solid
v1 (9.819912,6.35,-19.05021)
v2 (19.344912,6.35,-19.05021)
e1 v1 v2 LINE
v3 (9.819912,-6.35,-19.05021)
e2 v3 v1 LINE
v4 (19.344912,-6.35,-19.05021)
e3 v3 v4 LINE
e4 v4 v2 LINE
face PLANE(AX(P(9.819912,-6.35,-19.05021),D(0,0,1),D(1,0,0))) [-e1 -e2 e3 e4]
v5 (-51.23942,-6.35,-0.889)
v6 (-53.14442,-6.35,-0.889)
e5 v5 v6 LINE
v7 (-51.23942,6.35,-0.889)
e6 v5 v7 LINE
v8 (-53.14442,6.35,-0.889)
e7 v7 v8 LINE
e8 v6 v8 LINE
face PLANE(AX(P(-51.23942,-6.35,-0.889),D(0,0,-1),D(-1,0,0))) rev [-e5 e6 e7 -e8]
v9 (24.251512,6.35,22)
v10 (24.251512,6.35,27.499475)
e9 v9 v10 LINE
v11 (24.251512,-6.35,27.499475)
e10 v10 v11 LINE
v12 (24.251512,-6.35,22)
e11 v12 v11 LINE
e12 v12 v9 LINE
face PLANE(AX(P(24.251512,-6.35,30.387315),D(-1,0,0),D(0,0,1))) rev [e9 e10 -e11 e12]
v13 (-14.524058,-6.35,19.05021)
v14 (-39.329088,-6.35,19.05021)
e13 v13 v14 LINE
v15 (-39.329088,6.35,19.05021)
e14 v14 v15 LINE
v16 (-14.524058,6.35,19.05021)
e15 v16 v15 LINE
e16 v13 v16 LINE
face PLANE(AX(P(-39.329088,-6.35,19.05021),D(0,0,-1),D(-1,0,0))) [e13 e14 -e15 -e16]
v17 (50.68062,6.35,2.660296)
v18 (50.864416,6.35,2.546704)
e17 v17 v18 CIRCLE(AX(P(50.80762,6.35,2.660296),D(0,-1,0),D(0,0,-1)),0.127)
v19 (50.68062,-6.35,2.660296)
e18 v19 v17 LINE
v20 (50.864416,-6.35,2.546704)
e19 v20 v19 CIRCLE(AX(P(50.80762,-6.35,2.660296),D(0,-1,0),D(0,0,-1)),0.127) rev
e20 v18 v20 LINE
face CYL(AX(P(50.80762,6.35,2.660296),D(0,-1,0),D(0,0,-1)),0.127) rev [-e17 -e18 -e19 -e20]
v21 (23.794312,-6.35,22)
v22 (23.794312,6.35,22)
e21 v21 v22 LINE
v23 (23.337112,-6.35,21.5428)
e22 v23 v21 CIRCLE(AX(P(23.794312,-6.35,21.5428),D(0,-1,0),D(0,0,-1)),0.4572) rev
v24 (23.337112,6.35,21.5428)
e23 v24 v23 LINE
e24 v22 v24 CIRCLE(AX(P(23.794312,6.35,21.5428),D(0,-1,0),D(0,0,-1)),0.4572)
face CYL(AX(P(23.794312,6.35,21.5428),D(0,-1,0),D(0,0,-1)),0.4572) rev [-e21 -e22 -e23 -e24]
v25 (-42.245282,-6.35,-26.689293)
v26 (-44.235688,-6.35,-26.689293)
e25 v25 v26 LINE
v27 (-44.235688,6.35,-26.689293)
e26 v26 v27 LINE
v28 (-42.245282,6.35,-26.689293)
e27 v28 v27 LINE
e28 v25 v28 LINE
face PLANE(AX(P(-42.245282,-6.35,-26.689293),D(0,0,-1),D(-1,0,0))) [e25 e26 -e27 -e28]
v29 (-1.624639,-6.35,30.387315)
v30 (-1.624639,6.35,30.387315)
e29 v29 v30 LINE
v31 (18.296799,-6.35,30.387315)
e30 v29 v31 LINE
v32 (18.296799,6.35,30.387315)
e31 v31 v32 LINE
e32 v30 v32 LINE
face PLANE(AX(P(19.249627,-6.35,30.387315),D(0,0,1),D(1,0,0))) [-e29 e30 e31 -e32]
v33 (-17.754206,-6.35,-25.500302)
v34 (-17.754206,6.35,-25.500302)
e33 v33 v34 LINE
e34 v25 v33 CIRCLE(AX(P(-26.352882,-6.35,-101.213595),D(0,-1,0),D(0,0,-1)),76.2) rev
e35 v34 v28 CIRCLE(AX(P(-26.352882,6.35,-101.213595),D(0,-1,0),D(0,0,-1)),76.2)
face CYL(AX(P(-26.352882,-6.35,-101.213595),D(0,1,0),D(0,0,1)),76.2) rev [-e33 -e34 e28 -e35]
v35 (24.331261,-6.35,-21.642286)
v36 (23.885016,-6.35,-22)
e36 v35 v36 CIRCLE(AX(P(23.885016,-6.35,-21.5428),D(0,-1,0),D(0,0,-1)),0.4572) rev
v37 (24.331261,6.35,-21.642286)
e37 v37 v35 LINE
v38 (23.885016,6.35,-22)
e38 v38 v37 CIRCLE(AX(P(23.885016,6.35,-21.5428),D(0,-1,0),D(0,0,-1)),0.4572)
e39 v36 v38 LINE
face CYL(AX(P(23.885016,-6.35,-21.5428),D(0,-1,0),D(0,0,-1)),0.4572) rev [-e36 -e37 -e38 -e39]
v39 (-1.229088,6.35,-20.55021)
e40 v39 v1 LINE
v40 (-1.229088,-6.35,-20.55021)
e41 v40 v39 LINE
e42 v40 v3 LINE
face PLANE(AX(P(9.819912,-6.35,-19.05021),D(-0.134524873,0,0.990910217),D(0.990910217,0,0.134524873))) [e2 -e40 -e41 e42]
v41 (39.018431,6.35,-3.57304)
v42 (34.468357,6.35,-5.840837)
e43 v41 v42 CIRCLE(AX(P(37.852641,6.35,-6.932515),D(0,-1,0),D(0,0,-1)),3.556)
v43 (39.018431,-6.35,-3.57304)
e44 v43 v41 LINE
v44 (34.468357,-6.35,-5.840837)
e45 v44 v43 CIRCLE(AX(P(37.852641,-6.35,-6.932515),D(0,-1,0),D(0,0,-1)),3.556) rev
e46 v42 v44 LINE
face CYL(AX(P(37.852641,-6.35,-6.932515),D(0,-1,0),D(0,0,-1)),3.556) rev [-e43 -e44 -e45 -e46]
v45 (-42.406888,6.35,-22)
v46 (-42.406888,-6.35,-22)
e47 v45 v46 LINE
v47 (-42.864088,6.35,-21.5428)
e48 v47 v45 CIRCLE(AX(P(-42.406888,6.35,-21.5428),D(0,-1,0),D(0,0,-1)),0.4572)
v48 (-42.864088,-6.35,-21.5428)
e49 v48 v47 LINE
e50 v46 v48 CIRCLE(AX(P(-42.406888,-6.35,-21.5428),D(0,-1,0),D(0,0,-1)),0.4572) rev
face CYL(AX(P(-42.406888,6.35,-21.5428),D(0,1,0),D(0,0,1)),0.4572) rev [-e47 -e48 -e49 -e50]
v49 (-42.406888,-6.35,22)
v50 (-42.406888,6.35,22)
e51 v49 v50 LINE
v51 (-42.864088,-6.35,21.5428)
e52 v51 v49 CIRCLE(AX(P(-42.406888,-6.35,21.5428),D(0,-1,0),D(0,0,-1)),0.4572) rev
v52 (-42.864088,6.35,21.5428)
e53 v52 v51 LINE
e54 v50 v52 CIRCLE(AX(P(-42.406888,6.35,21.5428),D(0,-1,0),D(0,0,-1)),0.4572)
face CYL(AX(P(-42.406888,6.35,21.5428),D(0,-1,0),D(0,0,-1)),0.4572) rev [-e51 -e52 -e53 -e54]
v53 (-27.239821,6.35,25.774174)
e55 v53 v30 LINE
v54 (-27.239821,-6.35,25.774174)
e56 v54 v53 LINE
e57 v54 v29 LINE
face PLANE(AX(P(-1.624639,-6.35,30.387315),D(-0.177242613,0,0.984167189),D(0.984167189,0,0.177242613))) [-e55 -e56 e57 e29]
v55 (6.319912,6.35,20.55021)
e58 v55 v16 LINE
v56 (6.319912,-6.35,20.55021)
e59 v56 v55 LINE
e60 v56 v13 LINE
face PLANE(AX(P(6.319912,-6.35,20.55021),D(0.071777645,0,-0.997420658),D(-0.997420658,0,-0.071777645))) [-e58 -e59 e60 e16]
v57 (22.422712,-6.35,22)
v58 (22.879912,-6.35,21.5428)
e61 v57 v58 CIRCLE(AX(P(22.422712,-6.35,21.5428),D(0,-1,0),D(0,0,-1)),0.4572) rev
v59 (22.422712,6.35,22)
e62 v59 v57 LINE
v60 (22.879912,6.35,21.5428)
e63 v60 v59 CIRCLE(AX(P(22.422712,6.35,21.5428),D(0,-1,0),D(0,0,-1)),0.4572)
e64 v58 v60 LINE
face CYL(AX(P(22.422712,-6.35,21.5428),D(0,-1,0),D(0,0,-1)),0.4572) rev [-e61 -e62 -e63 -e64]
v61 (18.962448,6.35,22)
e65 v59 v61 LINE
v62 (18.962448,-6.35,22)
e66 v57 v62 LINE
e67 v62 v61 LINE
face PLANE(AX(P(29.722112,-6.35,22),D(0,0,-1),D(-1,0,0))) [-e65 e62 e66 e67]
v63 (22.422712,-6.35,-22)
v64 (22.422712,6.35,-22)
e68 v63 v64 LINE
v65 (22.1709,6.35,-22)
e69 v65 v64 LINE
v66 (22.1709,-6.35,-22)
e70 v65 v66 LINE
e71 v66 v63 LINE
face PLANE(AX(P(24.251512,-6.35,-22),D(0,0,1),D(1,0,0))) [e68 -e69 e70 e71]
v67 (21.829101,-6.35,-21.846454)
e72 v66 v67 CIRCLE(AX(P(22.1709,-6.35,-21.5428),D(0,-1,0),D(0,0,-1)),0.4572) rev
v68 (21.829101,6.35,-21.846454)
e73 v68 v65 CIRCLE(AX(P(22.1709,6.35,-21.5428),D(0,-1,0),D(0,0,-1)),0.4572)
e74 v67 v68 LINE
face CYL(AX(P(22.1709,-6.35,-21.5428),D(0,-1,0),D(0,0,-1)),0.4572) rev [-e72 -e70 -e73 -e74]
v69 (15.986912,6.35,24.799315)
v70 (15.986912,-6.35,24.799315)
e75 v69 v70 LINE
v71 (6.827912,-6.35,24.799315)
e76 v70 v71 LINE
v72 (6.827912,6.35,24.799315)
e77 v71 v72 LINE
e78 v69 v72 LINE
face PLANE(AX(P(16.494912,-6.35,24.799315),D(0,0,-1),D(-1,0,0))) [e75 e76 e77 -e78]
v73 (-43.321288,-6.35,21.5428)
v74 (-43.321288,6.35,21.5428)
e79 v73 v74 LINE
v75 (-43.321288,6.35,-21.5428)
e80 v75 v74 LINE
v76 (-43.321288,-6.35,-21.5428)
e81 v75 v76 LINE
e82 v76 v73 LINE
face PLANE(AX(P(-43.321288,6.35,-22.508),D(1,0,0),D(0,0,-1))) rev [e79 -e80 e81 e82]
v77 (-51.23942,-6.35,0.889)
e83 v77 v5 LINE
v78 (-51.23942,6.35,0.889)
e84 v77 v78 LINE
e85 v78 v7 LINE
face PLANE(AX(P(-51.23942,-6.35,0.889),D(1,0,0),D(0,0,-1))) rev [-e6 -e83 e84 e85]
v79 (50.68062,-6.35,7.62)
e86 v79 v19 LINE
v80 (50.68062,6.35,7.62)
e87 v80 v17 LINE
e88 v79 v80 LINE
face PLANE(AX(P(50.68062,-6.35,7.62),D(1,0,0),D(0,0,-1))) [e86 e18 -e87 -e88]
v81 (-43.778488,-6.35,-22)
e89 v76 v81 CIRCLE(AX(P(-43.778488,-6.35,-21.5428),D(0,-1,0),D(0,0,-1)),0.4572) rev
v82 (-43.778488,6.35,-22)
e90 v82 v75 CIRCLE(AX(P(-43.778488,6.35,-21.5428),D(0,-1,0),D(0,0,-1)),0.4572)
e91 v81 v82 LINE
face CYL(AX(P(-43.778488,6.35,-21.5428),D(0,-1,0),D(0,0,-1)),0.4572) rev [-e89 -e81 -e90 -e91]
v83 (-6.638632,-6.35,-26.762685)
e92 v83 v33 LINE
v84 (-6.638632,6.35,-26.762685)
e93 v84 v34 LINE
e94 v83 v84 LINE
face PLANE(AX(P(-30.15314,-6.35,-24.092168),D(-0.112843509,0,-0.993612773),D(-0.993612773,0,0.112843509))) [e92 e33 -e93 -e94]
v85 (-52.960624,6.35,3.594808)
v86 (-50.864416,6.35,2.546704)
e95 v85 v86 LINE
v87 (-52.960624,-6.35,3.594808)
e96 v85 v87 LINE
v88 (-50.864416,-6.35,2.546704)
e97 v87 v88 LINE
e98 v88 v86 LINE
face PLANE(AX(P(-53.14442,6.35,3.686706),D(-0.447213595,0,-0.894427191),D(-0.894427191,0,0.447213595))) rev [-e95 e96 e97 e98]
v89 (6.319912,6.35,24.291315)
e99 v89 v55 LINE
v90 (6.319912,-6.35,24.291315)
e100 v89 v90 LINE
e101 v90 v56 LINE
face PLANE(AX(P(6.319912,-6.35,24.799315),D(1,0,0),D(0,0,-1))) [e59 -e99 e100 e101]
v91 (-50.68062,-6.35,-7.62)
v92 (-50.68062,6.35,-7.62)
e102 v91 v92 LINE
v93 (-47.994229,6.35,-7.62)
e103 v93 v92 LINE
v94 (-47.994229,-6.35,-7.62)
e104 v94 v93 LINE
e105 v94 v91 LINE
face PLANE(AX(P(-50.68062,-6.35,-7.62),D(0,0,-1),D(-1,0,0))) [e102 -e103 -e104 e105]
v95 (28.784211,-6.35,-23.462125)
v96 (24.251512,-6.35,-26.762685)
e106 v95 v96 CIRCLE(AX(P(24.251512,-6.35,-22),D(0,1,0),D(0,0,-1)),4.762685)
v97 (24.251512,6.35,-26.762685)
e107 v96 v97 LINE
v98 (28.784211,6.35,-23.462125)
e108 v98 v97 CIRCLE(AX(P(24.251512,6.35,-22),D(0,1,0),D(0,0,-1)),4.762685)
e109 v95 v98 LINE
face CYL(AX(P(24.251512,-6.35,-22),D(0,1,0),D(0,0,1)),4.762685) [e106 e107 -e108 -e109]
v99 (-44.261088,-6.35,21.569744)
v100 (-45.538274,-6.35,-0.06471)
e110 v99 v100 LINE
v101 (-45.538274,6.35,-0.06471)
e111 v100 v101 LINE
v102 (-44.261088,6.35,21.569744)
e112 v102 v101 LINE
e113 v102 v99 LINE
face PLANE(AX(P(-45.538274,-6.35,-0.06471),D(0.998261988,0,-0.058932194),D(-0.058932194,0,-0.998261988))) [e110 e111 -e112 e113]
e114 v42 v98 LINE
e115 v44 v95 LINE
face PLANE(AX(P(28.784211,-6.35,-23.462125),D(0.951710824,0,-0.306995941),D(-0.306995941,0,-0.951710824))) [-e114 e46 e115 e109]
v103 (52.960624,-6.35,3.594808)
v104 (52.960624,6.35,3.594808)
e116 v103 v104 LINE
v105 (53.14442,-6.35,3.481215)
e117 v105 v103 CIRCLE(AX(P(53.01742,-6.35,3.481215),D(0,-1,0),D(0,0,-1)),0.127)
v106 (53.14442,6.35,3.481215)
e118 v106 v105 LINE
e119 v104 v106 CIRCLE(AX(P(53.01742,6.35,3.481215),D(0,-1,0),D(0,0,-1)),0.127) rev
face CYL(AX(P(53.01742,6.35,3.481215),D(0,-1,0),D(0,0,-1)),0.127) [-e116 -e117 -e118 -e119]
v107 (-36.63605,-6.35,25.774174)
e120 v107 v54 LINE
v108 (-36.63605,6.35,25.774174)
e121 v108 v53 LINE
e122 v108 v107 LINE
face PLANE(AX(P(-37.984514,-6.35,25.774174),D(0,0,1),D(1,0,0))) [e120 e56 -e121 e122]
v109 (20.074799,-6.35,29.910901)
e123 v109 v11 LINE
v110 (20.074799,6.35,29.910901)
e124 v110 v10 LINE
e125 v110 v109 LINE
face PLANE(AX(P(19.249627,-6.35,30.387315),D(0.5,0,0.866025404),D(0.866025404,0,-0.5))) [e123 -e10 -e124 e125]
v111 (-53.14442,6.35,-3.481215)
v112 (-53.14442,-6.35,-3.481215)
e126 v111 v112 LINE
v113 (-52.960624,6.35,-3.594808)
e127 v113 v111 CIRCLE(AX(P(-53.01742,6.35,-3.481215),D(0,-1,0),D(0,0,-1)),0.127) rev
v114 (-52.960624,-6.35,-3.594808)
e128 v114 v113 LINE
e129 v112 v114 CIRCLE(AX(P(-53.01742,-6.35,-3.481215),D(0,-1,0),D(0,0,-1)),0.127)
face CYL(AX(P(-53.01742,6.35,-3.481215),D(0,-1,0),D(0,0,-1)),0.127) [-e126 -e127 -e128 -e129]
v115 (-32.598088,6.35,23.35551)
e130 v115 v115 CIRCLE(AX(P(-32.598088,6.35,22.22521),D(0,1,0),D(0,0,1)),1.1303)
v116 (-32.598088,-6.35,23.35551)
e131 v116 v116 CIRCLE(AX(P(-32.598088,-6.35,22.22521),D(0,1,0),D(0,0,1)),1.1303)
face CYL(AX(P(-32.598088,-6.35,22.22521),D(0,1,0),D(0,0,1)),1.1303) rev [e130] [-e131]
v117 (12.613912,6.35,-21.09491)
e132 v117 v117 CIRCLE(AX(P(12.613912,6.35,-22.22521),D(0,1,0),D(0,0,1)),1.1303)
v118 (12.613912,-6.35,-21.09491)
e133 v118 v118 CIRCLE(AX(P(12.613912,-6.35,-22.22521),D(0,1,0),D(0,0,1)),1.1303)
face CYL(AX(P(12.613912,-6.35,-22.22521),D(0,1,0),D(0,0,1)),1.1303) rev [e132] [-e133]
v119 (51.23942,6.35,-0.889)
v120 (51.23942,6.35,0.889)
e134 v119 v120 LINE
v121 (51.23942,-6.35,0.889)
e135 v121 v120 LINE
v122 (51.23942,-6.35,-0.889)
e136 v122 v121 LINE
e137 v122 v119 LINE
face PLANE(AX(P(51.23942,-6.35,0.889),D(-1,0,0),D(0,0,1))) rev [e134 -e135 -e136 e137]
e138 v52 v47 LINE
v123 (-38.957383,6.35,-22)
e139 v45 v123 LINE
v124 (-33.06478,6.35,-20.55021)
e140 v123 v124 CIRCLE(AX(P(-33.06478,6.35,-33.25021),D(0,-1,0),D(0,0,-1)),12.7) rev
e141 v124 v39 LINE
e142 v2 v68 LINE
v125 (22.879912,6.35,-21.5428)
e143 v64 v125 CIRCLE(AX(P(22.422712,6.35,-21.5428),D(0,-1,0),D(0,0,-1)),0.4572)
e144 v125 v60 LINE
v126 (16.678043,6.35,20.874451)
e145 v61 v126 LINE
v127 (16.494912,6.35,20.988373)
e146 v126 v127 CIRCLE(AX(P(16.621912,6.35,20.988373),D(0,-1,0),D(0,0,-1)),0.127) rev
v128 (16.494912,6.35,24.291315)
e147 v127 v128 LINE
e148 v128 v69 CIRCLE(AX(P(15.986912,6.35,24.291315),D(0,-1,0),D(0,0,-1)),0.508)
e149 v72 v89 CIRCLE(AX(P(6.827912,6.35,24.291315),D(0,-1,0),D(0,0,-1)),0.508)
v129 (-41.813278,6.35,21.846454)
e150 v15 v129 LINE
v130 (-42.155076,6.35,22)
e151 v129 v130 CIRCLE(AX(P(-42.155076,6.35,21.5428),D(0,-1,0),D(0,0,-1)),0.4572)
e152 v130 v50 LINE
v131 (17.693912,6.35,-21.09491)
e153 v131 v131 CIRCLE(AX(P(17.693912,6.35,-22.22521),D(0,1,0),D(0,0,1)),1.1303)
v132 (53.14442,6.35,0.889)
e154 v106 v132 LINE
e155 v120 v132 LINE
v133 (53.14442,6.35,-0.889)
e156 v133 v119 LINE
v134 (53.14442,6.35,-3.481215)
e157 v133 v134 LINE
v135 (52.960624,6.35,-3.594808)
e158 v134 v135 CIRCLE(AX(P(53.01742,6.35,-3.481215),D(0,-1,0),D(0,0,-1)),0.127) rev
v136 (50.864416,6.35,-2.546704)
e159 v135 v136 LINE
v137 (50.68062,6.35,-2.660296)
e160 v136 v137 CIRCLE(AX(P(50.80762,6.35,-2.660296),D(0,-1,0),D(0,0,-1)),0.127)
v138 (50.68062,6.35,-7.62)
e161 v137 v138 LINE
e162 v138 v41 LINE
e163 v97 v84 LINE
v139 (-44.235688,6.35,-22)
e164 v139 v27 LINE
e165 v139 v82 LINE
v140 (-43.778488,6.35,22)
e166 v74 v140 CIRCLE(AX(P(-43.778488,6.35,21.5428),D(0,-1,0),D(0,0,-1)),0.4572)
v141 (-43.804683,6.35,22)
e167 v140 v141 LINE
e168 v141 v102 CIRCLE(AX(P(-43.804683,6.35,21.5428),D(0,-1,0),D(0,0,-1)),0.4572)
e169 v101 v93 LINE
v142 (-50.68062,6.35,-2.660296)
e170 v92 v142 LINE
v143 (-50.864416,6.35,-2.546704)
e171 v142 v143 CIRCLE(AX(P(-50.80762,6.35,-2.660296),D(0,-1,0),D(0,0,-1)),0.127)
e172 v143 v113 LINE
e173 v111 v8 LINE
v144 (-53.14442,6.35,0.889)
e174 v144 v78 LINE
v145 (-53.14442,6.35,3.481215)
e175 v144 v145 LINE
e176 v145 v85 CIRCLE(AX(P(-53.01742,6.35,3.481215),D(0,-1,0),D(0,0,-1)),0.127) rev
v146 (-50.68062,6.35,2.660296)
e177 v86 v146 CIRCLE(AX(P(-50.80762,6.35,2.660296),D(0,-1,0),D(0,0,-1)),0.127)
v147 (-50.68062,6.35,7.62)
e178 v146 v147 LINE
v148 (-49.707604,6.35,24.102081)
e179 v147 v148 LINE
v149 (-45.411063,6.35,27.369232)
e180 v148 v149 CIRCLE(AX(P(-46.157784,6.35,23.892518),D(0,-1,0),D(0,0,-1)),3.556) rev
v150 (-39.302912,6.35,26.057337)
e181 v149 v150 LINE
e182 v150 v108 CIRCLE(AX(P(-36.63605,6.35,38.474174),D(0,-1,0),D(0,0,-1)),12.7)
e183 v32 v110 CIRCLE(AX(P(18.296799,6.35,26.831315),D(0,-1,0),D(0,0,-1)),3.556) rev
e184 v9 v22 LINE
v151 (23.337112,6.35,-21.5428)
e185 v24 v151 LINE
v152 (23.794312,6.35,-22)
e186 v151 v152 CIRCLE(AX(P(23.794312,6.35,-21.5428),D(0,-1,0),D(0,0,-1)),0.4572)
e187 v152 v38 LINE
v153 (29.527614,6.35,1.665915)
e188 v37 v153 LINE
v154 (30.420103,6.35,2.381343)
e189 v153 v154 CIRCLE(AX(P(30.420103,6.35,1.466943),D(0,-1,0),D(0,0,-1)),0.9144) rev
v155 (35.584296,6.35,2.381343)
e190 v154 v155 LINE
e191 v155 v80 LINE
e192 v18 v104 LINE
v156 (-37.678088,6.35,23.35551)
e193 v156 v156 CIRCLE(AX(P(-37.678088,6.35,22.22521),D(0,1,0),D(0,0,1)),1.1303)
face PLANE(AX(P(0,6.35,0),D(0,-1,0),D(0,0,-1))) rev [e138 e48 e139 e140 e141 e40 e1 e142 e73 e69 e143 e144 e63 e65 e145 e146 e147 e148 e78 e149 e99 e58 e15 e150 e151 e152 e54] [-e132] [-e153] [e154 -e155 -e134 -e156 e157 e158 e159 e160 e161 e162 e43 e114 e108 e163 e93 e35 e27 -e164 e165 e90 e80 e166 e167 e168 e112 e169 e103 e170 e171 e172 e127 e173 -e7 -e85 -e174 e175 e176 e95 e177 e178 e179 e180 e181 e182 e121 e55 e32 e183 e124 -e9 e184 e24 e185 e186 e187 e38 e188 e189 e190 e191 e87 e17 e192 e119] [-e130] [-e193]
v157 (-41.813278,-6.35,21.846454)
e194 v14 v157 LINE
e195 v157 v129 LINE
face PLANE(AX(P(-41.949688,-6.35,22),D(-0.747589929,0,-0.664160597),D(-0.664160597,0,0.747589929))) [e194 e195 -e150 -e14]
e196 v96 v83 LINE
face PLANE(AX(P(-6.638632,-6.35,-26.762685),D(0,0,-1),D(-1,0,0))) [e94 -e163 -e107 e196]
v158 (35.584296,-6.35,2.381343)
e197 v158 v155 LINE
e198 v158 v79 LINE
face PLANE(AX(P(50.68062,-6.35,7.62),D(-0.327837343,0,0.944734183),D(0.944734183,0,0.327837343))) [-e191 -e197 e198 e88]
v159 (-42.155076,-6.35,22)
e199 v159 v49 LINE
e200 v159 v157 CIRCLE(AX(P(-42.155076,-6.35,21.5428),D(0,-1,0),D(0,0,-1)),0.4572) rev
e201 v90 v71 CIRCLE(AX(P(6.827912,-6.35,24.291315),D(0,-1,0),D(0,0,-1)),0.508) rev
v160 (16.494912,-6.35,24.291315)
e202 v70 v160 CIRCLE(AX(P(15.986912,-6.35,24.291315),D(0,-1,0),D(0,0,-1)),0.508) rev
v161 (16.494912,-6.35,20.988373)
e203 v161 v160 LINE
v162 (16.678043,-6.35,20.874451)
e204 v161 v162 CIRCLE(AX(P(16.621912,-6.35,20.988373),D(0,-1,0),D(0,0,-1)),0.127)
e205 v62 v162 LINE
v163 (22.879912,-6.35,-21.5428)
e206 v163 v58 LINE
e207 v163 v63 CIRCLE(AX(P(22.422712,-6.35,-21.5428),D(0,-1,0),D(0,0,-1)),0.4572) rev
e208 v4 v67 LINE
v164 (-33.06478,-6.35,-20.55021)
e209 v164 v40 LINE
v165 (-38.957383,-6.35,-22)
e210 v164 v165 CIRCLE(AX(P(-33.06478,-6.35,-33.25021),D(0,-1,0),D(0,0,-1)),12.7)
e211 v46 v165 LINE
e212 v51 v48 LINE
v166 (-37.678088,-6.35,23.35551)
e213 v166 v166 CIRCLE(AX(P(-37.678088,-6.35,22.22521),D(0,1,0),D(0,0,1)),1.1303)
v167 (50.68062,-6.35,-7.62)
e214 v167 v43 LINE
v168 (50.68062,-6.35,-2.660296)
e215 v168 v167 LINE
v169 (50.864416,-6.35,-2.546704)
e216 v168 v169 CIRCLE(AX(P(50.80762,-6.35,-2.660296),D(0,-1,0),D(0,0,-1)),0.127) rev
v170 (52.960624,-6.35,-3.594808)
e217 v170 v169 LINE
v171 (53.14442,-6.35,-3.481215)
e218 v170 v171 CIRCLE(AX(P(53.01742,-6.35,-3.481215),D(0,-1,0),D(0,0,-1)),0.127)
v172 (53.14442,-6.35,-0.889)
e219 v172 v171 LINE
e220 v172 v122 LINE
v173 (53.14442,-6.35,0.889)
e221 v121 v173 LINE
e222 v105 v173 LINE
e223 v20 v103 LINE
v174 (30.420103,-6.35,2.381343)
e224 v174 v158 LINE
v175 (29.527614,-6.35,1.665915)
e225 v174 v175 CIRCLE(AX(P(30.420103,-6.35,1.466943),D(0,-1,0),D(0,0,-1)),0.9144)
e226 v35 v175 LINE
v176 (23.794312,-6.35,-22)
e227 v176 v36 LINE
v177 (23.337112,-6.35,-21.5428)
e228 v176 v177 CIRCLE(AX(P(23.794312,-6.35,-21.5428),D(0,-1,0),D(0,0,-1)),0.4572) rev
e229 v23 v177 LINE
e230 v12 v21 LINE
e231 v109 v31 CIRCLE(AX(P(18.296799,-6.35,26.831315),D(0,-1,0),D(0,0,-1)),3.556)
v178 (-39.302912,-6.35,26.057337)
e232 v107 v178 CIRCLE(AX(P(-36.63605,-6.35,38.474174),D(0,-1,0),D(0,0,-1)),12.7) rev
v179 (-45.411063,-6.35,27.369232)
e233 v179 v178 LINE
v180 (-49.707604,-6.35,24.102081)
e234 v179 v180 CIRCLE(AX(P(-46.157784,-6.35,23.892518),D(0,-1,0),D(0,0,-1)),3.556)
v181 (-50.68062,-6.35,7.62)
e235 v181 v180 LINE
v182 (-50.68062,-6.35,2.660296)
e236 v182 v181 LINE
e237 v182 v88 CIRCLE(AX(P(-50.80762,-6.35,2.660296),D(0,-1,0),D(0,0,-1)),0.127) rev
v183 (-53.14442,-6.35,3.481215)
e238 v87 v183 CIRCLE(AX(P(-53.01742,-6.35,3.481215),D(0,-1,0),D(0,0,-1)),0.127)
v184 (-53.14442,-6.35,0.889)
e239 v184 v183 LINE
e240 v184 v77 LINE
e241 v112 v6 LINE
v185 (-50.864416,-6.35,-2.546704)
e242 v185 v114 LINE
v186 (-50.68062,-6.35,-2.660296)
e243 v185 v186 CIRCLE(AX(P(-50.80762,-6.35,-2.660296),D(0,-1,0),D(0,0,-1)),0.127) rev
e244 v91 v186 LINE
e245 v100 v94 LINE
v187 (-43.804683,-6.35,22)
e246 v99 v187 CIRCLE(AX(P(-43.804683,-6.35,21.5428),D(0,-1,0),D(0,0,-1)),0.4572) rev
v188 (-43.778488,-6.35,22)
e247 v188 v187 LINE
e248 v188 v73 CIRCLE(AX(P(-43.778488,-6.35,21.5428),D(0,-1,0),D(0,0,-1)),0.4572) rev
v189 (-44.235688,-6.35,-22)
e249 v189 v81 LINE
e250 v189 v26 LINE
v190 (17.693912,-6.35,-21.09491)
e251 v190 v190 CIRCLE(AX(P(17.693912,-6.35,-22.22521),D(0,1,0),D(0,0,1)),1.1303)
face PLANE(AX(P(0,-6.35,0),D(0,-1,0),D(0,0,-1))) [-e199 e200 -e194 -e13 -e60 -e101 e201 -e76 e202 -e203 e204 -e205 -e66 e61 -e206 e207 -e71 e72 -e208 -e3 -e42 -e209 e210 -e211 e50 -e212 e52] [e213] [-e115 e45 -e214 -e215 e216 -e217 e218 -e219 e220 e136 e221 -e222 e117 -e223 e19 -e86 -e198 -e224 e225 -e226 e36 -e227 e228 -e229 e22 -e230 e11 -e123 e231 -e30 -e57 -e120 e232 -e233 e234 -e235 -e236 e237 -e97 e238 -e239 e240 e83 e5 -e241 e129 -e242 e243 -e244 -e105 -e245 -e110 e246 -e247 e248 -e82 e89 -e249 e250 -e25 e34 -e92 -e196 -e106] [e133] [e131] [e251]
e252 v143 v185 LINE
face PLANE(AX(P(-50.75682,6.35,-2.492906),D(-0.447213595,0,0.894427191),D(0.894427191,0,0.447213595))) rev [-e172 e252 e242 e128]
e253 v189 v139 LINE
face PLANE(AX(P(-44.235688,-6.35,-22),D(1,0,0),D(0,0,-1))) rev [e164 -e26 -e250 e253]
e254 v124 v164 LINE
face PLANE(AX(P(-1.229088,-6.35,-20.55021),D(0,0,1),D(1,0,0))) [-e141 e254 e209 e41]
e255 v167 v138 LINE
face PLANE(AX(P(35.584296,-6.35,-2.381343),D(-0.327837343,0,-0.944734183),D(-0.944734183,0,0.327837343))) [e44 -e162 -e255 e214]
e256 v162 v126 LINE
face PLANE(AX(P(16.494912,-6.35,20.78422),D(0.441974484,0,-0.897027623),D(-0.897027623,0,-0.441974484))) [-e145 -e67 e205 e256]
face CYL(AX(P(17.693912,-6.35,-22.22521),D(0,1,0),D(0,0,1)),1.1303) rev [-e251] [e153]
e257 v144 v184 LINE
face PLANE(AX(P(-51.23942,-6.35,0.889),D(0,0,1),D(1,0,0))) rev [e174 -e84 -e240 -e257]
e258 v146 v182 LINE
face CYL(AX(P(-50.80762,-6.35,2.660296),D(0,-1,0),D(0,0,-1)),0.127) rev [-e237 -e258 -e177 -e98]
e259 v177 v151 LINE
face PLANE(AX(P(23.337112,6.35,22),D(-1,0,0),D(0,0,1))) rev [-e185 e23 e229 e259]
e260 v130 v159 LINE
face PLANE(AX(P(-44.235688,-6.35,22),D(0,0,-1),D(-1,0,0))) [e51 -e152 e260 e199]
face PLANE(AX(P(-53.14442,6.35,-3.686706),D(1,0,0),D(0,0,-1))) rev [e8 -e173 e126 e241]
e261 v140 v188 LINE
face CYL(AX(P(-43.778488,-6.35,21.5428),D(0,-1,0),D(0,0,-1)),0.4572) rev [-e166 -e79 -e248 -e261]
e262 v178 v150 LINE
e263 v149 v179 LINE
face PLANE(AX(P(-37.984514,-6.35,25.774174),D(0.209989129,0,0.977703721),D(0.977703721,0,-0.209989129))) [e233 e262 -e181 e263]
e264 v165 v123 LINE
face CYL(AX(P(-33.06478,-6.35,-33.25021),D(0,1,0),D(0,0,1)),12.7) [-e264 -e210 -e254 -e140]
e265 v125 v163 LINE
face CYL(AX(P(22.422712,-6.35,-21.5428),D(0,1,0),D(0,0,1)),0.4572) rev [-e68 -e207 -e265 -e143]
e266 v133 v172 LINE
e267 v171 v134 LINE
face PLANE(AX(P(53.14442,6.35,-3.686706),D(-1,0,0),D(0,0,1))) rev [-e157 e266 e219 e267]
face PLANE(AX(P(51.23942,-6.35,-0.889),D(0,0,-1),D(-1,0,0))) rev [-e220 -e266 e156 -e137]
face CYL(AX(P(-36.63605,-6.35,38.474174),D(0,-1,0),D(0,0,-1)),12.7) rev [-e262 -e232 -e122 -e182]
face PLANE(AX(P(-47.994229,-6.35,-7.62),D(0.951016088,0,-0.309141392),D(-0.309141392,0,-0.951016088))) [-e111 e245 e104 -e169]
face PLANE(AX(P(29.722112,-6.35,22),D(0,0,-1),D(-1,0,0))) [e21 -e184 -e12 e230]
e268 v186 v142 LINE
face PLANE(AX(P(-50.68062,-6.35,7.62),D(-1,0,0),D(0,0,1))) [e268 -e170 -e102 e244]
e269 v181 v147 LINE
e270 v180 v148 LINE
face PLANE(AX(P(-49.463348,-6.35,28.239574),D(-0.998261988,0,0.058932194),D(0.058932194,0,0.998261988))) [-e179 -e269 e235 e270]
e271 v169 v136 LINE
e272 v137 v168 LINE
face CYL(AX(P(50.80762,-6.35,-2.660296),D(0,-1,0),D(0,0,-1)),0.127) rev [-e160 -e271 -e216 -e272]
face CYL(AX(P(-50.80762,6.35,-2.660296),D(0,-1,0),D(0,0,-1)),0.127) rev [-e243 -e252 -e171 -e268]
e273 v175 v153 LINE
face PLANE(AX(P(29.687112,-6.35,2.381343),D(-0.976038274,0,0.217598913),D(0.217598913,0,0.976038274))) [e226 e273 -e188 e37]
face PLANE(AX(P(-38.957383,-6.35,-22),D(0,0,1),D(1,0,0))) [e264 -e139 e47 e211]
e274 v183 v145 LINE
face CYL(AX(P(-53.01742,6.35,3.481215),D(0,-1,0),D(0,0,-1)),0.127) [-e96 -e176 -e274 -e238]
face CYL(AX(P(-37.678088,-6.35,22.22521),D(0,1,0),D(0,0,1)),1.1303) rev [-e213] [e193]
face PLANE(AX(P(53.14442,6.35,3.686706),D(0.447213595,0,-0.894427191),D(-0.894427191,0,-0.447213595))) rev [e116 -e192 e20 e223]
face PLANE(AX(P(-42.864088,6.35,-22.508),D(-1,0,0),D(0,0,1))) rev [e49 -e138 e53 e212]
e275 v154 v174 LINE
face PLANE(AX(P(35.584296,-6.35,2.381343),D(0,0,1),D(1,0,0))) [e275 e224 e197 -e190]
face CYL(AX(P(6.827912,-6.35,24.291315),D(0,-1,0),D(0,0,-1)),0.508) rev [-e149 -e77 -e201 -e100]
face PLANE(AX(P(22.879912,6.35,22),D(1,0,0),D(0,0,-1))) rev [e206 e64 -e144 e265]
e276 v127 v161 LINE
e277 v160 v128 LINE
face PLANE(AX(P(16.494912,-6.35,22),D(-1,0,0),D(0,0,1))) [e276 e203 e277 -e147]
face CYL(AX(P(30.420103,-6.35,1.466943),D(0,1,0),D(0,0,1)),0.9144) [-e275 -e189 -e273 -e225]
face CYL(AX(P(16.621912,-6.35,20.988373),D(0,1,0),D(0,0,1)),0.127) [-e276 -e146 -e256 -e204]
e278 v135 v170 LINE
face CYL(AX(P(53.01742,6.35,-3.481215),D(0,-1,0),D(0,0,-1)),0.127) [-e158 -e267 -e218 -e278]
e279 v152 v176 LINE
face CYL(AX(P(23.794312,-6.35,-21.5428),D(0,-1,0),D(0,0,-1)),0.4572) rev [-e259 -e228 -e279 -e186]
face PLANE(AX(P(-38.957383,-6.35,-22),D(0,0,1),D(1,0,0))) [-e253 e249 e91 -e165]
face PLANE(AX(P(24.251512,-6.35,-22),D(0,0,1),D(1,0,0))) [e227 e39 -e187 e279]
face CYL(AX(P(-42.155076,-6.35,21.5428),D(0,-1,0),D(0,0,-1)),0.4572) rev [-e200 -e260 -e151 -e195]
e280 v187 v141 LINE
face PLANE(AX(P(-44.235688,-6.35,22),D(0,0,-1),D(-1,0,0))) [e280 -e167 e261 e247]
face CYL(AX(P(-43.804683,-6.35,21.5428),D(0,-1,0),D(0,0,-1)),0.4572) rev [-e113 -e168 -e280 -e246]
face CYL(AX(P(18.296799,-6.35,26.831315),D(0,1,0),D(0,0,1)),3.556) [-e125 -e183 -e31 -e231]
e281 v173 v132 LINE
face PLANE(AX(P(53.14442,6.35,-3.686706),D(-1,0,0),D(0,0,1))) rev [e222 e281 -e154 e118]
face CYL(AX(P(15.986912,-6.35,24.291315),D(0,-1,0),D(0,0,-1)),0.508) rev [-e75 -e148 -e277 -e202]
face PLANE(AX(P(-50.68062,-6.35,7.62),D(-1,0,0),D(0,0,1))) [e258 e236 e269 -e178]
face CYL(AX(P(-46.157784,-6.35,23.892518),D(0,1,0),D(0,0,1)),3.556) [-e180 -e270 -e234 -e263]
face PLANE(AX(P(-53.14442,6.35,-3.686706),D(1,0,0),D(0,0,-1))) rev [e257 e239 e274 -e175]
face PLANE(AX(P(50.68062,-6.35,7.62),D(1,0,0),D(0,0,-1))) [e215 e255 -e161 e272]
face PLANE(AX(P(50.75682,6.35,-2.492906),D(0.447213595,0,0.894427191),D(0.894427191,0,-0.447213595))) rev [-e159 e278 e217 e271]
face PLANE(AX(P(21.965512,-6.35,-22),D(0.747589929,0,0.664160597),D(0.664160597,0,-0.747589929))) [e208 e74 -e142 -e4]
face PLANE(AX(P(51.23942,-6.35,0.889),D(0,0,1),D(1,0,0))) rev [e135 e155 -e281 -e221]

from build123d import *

# Parameters (mm, degrees)
BOSS_EXTRUDE1_DEPTH        = 6.35
BOSS_EXTRUDE1_DEPTH_BACK   = 6.35
BOSS_EXTRUDE1_2_DEPTH      = 6.35
BOSS_EXTRUDE1_2_DEPTH_BACK = 6.35
BOSS_EXTRUDE2_DEPTH        = 6.35
BOSS_EXTRUDE2_DEPTH_BACK   = 6.35
SKETCH3_W                  = 0.4572
SKETCH3_H                  = 44.508
BOSS_EXTRUDE4_DEPTH        = 6.35
BOSS_EXTRUDE4_DEPTH_BACK   = 6.35
SKETCH8_W                  = 2.032
SKETCH8_H                  = 1.778
CUT_EXTRUDE1_DEPTH         = 63.522062345
FILLET1_R                  = 0.4572
FILLET2_R                  = 0.9144
FILLET3_R                  = 3.556
FILLET6_R                  = 12.7
SKETCH9_R                  = 1.1303
CUT_EXTRUDE2_DEPTH         = 63.522062345
FILLET7_R                  = 0.127
FILLET8_R                  = 0.508
FILLET9_R                  = 76.2
SKETCH12_W                 = 3.975578287
SKETCH12_H                 = 4.68929279
SKETCH12_W_2               = 5.470600001
SKETCH12_H_2               = 8.387314833
CUT_EXTRUDE3_DEPTH         = 63.522062345
FILLET10_R                 = 0.127


with BuildPart() as part:
    # Sketch2 → Boss-Extrude1 (new, two sides: drawn at the far end of the back side and taken through both)
    with BuildSketch(Plane(origin=(0, 0, 0), x_dir=(1, 0, 0), z_dir=(0, 1, 0)).offset(-BOSS_EXTRUDE1_DEPTH_BACK)):
        with BuildLine():
            Line((9.819911786, 19.050210052), (19.344911786, 19.050210052))
            Line((19.344911786, 19.050210052), (21.965511899, 22))
            Line((21.965511899, 22), (24.251511899, 22))
            Line((24.251511899, 22), (29.687111899, -2.381342584))
            Line((29.687111899, -2.381342584), (35.584296061, -2.381342584))
            Line((35.584296061, -2.381342584), (50.68062, -7.62))
            Line((50.68062, -7.62), (50.68062, 7.62))
            Line((50.68062, 7.62), (35.584296061, 2.381342584))
            Line((35.584296061, 2.381342584), (28.784210924, 23.462125012))
            ThreePointArc((28.784210924, 23.462125012), (27.055039043, 25.850117603), (24.251511899, 26.762685167))
            Line((24.251511899, 26.762685167), (-6.638632099, 26.762685167))
            Line((-6.638632099, 26.762685167), (-30.153140375, 24.092168337))
            Line((-30.153140375, 24.092168337), (-42.245281802, 26.68929279))
            Line((-42.245281802, 26.68929279), (-48.211266614, 26.68929279))
            Line((-48.211266614, 26.68929279), (-48.211266614, 22))
            Line((-48.211266614, 22), (-38.957383068, 22))
            Line((-38.957383068, 22), (-36.496303445, 20.550210052))
            Line((-36.496303445, 20.550210052), (-1.229088214, 20.550210052))
            Line((-1.229088214, 20.550210052), (9.819911786, 19.050210052))
        make_face()
    extrude(amount=BOSS_EXTRUDE1_DEPTH + BOSS_EXTRUDE1_DEPTH_BACK)



with BuildPart() as body_2:
    # Sketch2 → Boss-Extrude1 2 (new, two sides: drawn at the far end of the back side and taken through both)
    with BuildSketch(Plane(origin=(0, 0, 0), x_dir=(1, 0, 0), z_dir=(0, 1, 0)).offset(-BOSS_EXTRUDE1_2_DEPTH_BACK)):
        Polygon((-50.68062, 7.62), (-47.994229245, 7.62), (-45.538273994, 0.064709726), (-44.235688327, -22), (-41.949688327, -22), (-39.329088214, -19.050210052), (-14.524057774, -19.050210052), (6.319911674, -20.5502101), (6.319911674, -24.799314833), (16.494911898, -24.799314833), (16.494911898, -22), (16.494911898, -20.7842203), (18.962447951, -22), (29.7221119, -22), (29.7221119, -24.341022744), (19.249626804, -30.387314833), (-1.624639293, -30.387314833), (-27.239820872, -25.774174137), (-37.984514025, -25.774174137), (-49.463347649, -28.239573642), (-50.68062, -7.62), align=None)
    extrude(amount=BOSS_EXTRUDE1_2_DEPTH + BOSS_EXTRUDE1_2_DEPTH_BACK)


with BuildPart() as part_1:
    add(part.part)

    add(body_2.part)  # Boss-Extrude2 merges body 2
    # Sketch3 → Boss-Extrude2 (add, two sides: drawn at the far end of the back side and taken through both)
    with BuildSketch(Plane(origin=(0, 0, 0), x_dir=(1, 0, 0), z_dir=(0, 1, 0)).offset(-BOSS_EXTRUDE2_DEPTH_BACK)):
        with Locations((-43.092688327, 0.254)):
            Rectangle(SKETCH3_W, SKETCH3_H)
        with Locations((23.108511899, 0.254)):
            Rectangle(SKETCH3_W, SKETCH3_H)
    extrude(amount=BOSS_EXTRUDE2_DEPTH + BOSS_EXTRUDE2_DEPTH_BACK)

    # Sketch7 → Boss-Extrude4 (add, two sides: drawn at the far end of the back side and taken through both)
    with BuildSketch(Plane(origin=(0, 0, 0), x_dir=(1, 0, 0), z_dir=(0, 1, 0)).offset(-BOSS_EXTRUDE4_DEPTH_BACK)):
        Polygon((-53.14442, 3.68670581), (-53.14442, -3.68670581), (-50.75682, -2.49290581), (-50.68062, -2.45480581), (-50.68062, 2.45480581), (-50.75682, 2.49290581), align=None)
        Polygon((50.68062, 2.45480581), (50.68062, -2.45480581), (50.75682, -2.49290581), (53.14442, -3.68670581), (53.14442, 3.68670581), (50.75682, 2.49290581), align=None)
    extrude(amount=BOSS_EXTRUDE4_DEPTH + BOSS_EXTRUDE4_DEPTH_BACK)

    # Sketch8 → Cut-Extrude1 (cut, through all)
    with BuildSketch(Plane(origin=(0, 6.35, 0), x_dir=(1, 0, 0), z_dir=(0, 1, 0))):
        with Locations((-52.25542, 0)):
            Rectangle(SKETCH8_W, SKETCH8_H)
        with Locations((52.25542, 0)):
            Rectangle(SKETCH8_W, SKETCH8_H)
    extrude(amount=-CUT_EXTRUDE1_DEPTH, mode=Mode.SUBTRACT)

    # Fillet1
    fillet1_edges = [part_1.edges().sort_by_distance(p)[0] for p in [
        (-43.321288327, 0, -22),
        (24.251511899, 0, -22),
        (21.965511899, 0, -22),
        (-42.864088327, 0, -22),
        (23.337111899, 0, -22),
        (22.879911899, 0, -22),
        (22.879911899, 0, 22),
        (23.337111899, 0, 22),
        (-44.235688327, 0, 22),
        (-41.949688327, 0, 22),
        (-42.864088327, 0, 22),
        (-43.321288327, 0, 22),
    ]]
    fillet(fillet1_edges, radius=FILLET1_R)

    # Fillet2
    fillet2_edges = [part_1.edges().sort_by_distance(p)[0] for p in [
        (29.687111899, 0, 2.381342584),
        (-48.211266614, 0, -22),
        (-48.211266614, 0, -26.68929279),
        (29.7221119, 0, 22),
        (29.7221119, 0, 24.341022744),
    ]]
    fillet(fillet2_edges, radius=FILLET2_R)

    # Fillet3
    fillet3_edges = [part_1.edges().sort_by_distance(p)[0] for p in [
        (35.584296061, 0, -2.381342584),
        (19.249626804, 0, 30.387314833),
        (-49.463347649, 0, 28.239573642),
    ]]
    fillet(fillet3_edges, radius=FILLET3_R)

    # Fillet6
    # the kernel refuses this fillet: 12.7 mm, written as the material it adds along each edge
    with BuildSketch(Plane(origin=(-37.984514025, 6.35, 25.774174137), x_dir=(1, 0, 0), z_dir=(0, -1, 0))) as fillet6_piece_1:
        with BuildLine():
            CenterArc((FILLET6_R * 0.106178254311, FILLET6_R), FILLET6_R, 257.878284844, 12.121715156)
            Line((-FILLET6_R * 0.103810874318, FILLET6_R * 0.0222962791022), (0, 0))
            Line((0, 0), (FILLET6_R * 0.106178254311, 0))
        make_face()
    extrude(amount=12.7)
    # the kernel refuses this fillet: 12.7 mm, written as the material it takes off along each edge
    with BuildSketch(Plane(origin=(-36.496303445, 14.928809219, -20.550210052), x_dir=(-0.8616133508003352, 0, -0.507565201449645), z_dir=(0, -1, 0))) as fillet6_2_piece_1:
        with BuildLine():
            CenterArc((3.489431436, 12.684211567), FILLET6_R, 239.498215304, 27.644521231)
            Line((-2.956646623, 1.741722012), (0, 0))
            Line((0, 0), (2.856361988, 0))
        make_face()
    extrude(amount=29.857618438, mode=Mode.SUBTRACT)

    # Sketch9 → Cut-Extrude2 (cut, through all)
    with BuildSketch(Plane(origin=(0, 6.35, 0), x_dir=(1, 0, 0), z_dir=(0, 1, 0))):
        with Locations(Location((-37.678088214, -22.225210052, 0), (0, 0, 270))):
            Circle(SKETCH9_R)
        with Locations(Location((-32.598088214, -22.225210052, 0), (0, 0, 270))):
            Circle(SKETCH9_R)
        with Locations(Location((12.613911786, 22.225210052, 0), (0, 0, 270))):
            Circle(SKETCH9_R)
        with Locations(Location((17.693911786, 22.225210052, 0), (0, 0, 270))):
            Circle(SKETCH9_R)
    extrude(amount=-CUT_EXTRUDE2_DEPTH, mode=Mode.SUBTRACT)

    # Fillet7
    fillet7_edges = [part_1.edges().sort_by_distance(p)[0] for p in [
        (16.494911898, 0, 20.7842203),
    ]]
    fillet(fillet7_edges, radius=FILLET7_R)

    # Fillet8
    fillet8_edges = [part_1.edges().sort_by_distance(p)[0] for p in [
        (6.319911674, 0, 24.799314833),
        (16.494911898, 0, 24.799314833),
    ]]
    fillet(fillet8_edges, radius=FILLET8_R)

    # Fillet9
    # the kernel refuses this fillet: 76.2 mm, written as the material it adds along each edge
    with BuildSketch(Plane(origin=(-30.153140375, -6.35, -24.092168337), x_dir=(-0.9777037208978189, 0, -0.20998912862945954), z_dir=(0, 1, 0))) as fillet9_piece_1_section:
        with BuildLine():
            CenterArc((FILLET9_R * 0.16376499609, -FILLET9_R), FILLET9_R, 90, 18.600972695)
            Line((-FILLET9_R * 0.155210403169, -FILLET9_R * 0.0522370050125), (0, 0))
            Line((0, 0), (FILLET9_R * 0.16376499609, 0))
        make_face()
    fillet9_piece_1 = extrude(amount=12.7, mode=Mode.PRIVATE)
    fillet9_piece_1 = split(fillet9_piece_1, bisect_by=Plane(origin=(-30.153140375, -6.35, -26.68929279), z_dir=(0, 0, 1)), keep=Keep.TOP, mode=Mode.PRIVATE)
    add(fillet9_piece_1)

    # Sketch12 → Cut-Extrude3 (cut, through all)
    with BuildSketch(Plane(origin=(0, 6.35, 0), x_dir=(1, 0, 0), z_dir=(0, 1, 0))):
        with Locations((-46.223477471, 24.344646395)):
            Rectangle(SKETCH12_W, SKETCH12_H)
        with Locations((26.9868119, -26.193657417)):
            Rectangle(SKETCH12_W_2, SKETCH12_H_2)
    extrude(amount=-CUT_EXTRUDE3_DEPTH, mode=Mode.SUBTRACT)

    # Fillet10
    fillet10_edges = [part_1.edges().sort_by_distance(p)[0] for p in [
        (50.68062, 0, -2.45480581),
        (50.68062, 0, 2.45480581),
        (53.14442, 0, 3.68670581),
        (53.14442, 0, -3.68670581),
        (-50.68062, 0, 2.45480581),
        (-50.68062, 0, -2.45480581),
        (-53.14442, 0, -3.68670581),
        (-53.14442, 0, 3.68670581),
    ]]
    fillet(fillet10_edges, radius=FILLET10_R)


solid = part_1.part
